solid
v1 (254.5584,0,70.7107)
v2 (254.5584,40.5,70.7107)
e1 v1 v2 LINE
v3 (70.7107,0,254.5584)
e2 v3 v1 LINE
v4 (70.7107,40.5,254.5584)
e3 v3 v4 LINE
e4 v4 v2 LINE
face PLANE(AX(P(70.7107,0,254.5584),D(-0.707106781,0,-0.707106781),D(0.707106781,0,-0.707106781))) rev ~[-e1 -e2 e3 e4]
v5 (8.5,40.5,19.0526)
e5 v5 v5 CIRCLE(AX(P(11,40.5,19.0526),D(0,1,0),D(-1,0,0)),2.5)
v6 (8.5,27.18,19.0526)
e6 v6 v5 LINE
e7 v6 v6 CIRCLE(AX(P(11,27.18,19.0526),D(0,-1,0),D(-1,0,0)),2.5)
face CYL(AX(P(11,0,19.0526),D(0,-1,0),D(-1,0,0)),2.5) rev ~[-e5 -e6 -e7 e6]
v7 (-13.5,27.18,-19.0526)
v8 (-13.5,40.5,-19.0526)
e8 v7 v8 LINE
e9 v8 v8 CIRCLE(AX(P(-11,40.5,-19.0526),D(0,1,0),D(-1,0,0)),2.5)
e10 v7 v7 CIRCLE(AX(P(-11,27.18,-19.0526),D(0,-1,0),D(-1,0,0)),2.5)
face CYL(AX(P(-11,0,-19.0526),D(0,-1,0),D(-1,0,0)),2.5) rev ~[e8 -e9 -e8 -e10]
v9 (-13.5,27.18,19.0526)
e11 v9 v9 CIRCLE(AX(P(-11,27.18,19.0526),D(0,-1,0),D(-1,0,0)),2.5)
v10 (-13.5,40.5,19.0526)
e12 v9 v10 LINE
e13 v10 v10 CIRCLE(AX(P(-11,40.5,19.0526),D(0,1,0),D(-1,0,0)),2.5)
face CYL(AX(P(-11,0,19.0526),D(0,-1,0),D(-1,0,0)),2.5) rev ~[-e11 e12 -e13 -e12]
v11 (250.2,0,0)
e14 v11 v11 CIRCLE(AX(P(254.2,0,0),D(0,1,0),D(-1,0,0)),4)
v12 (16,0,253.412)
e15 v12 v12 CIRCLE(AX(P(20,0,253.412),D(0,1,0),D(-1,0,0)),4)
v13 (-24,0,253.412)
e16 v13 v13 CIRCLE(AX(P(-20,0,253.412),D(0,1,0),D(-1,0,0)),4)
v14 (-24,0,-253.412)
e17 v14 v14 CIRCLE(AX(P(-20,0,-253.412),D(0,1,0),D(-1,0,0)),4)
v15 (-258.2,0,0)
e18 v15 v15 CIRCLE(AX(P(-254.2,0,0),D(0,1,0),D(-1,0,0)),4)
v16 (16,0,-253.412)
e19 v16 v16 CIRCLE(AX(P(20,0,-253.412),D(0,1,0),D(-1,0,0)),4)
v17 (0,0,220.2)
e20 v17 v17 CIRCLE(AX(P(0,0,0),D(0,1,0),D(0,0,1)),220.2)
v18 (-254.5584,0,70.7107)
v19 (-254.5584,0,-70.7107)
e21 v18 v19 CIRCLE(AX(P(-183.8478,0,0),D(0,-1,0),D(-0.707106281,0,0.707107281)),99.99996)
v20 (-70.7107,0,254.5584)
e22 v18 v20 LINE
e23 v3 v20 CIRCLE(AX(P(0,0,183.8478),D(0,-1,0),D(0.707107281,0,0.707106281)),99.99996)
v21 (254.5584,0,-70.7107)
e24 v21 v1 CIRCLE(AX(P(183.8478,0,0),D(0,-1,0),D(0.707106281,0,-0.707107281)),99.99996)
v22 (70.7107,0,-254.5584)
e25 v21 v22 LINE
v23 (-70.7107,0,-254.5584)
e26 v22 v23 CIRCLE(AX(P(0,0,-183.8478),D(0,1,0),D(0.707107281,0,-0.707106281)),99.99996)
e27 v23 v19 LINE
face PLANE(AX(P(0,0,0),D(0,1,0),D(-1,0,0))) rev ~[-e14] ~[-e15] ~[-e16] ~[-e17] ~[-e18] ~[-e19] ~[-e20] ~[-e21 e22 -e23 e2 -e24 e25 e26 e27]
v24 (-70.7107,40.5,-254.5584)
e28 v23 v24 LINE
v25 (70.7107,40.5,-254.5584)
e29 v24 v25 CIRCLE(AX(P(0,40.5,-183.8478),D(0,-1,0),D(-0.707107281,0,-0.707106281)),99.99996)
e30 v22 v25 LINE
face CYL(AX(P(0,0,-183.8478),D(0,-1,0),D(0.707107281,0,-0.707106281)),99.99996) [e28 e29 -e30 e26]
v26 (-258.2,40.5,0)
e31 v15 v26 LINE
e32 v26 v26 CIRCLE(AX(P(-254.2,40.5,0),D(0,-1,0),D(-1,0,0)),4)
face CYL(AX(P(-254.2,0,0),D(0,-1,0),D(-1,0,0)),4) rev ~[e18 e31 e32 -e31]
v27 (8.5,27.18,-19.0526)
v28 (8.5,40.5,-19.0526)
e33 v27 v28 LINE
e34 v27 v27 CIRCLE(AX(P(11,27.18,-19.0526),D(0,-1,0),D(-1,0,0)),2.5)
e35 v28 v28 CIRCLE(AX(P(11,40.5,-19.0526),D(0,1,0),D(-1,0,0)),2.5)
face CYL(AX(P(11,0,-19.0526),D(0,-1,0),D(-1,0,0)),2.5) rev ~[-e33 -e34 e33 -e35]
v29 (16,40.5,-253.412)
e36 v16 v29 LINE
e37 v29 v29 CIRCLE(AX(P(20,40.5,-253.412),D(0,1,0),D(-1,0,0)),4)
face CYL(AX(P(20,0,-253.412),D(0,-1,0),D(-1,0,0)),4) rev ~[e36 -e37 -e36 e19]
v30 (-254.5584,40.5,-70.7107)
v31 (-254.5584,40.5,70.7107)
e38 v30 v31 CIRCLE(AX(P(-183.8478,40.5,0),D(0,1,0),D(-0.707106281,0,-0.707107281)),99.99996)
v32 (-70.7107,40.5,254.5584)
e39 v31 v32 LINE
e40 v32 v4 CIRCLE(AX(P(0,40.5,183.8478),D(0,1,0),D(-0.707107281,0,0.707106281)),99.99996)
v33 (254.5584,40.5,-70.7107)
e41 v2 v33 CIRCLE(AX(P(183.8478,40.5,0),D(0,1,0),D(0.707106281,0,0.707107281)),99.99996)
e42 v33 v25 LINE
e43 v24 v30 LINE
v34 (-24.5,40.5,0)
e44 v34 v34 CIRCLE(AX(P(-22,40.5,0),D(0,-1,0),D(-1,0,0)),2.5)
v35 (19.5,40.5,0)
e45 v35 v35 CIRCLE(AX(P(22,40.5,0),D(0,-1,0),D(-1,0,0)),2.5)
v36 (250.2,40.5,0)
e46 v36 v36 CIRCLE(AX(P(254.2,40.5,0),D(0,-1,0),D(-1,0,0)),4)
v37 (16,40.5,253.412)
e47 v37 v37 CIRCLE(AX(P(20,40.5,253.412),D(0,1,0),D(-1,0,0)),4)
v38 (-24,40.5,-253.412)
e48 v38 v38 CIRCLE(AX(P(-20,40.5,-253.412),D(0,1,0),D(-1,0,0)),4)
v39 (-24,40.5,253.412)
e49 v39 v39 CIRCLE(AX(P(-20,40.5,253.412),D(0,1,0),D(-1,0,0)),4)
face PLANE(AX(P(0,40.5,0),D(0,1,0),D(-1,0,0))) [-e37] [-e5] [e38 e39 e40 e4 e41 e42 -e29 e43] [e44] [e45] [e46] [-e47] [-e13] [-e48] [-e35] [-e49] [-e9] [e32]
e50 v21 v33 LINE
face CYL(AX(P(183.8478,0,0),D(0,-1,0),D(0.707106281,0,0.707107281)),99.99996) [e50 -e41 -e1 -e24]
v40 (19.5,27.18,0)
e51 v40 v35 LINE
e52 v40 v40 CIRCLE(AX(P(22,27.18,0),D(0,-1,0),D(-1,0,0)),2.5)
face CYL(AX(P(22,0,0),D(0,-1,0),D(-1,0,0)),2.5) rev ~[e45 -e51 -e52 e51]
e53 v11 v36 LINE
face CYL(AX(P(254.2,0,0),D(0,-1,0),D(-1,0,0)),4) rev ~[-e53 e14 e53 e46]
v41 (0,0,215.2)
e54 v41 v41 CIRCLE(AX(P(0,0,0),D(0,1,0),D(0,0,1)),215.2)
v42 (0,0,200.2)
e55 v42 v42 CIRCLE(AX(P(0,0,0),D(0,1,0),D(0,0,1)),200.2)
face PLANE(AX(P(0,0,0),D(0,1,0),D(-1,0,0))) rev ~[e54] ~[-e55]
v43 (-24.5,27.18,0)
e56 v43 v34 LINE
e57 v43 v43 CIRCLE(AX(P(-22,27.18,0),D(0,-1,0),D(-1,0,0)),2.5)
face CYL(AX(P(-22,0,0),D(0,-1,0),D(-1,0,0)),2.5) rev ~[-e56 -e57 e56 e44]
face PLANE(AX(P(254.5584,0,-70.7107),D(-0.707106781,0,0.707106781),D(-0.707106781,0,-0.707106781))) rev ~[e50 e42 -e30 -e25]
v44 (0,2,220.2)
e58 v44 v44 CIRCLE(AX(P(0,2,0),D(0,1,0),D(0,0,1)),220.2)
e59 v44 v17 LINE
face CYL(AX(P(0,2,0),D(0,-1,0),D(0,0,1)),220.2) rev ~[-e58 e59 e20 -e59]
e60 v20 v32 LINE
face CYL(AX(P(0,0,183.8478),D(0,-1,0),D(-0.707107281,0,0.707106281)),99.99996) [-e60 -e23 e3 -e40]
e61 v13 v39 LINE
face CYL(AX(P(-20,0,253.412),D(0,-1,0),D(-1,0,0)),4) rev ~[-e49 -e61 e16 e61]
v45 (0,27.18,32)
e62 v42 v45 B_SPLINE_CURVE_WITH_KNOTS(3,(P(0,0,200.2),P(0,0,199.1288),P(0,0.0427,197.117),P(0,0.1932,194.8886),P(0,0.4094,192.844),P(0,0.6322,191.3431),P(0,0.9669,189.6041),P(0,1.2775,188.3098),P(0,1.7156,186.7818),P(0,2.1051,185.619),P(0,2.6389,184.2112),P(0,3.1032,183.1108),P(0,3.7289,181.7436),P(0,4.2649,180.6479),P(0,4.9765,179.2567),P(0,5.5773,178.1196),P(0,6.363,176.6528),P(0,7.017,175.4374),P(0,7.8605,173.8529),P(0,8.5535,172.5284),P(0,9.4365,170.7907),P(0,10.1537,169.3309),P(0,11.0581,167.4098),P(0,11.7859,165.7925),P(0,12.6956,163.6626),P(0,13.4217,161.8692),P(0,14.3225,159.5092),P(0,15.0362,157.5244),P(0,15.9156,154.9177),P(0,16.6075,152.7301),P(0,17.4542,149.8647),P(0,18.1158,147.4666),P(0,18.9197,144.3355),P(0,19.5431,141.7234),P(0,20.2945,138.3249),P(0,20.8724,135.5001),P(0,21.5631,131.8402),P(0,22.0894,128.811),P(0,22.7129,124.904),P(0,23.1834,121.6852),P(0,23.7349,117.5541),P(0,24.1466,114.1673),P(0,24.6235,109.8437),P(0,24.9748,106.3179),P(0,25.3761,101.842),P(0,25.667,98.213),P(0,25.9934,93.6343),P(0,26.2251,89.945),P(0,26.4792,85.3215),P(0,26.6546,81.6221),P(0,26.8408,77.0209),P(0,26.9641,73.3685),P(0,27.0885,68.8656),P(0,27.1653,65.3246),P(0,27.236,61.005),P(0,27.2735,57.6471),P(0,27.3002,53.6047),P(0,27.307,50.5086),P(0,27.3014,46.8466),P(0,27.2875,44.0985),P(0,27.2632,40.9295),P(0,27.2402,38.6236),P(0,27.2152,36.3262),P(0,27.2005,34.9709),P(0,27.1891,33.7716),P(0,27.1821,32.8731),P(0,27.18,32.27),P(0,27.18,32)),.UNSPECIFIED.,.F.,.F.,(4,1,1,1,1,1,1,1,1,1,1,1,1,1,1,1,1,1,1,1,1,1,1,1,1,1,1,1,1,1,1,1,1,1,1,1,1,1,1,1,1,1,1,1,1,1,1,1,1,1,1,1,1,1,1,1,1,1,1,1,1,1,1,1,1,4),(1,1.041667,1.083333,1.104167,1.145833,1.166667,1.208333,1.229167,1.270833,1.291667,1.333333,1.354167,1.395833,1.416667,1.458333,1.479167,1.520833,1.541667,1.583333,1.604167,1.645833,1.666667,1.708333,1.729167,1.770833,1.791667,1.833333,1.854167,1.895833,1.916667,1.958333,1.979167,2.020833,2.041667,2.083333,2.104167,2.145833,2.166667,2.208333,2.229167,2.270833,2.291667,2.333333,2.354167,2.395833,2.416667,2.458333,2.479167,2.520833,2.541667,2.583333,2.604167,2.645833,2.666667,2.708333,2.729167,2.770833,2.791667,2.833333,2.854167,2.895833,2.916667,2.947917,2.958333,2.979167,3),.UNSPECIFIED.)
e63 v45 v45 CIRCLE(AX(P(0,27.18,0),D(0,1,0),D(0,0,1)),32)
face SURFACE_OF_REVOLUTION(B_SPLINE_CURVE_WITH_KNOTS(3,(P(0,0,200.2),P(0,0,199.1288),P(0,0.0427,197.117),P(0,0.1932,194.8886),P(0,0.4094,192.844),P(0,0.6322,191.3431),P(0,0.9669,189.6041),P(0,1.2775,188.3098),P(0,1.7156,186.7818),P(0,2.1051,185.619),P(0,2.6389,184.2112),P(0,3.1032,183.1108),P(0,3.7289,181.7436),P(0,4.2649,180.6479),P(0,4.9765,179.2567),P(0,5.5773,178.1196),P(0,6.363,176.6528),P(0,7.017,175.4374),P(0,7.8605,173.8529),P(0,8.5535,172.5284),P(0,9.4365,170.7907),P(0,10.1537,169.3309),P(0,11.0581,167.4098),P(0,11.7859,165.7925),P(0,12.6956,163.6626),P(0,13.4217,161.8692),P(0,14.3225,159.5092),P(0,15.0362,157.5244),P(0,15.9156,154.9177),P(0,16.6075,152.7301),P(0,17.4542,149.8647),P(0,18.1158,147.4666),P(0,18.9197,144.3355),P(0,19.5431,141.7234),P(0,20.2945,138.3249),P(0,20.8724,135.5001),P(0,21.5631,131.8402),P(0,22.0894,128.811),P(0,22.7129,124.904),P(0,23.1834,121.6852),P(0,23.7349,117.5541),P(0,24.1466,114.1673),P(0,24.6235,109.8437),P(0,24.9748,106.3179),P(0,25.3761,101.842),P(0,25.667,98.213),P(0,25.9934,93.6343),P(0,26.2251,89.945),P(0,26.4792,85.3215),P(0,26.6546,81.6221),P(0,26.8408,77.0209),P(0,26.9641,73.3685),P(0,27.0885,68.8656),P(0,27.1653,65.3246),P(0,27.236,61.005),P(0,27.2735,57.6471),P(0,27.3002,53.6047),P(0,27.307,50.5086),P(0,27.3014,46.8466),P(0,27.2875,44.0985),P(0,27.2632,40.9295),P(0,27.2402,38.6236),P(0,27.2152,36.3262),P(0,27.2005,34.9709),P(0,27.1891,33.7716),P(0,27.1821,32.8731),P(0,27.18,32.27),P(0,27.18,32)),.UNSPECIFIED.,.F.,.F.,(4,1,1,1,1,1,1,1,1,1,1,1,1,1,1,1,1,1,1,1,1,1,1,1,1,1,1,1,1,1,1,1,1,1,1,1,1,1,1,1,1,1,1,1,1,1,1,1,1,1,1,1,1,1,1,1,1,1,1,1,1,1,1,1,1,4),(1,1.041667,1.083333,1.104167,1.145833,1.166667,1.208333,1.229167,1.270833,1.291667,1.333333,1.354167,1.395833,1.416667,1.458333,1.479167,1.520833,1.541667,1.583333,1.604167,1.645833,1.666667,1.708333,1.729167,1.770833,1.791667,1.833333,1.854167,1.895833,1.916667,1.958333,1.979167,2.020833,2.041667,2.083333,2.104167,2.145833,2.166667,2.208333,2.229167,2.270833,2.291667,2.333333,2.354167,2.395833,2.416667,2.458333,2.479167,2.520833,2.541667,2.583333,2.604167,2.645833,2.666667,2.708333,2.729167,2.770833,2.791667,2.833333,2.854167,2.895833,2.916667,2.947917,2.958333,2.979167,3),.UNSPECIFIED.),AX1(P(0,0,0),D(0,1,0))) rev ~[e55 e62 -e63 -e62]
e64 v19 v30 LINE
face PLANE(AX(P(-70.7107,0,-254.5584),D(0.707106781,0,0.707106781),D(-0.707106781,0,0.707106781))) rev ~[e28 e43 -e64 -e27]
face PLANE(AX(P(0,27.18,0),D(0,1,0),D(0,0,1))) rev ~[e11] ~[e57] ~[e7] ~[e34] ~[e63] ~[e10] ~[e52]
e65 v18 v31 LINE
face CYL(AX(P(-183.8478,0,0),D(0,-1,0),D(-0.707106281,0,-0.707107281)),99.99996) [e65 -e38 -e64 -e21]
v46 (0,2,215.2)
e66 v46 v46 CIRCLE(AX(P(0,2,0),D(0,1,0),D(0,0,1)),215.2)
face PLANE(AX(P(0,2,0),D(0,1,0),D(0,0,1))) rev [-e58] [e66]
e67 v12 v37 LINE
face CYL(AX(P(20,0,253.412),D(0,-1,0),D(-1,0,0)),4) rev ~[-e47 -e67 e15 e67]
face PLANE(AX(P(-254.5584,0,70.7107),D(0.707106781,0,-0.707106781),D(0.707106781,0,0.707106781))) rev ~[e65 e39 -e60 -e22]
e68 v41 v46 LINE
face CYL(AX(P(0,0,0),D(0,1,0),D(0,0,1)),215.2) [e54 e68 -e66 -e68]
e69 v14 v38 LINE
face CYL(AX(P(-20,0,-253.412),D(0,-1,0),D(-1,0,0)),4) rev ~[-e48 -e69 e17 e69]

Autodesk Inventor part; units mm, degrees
ref_plane "YZ Plane" through (0, 0, 0) normal (1, 0, 0) x (0, 1, 0)
ref_plane "XZ Plane" through (0, 0, 0) normal (0, 1, 0) x (-1, 0, 0)
sketch "Esquisse1" plane through (0, 0, 0) normal (0, 1, 0) x (-1, 0, 0)
  circle A0 centre (0, 0) radius 215.2 construction
  line L0 (0, -455.3768) -> (0, 455.3768) projected
  line L1 (-455.3768, 0) -> (455.3768, 0) projected
  line L2 (70.7107, -254.5584) -> (254.5584, -70.7107)
  line L3 (254.5584, 70.7107) -> (70.7107, 254.5584)
  line L4 (-70.7107, 254.5584) -> (-254.5584, 70.7107)
  line L5 (-254.5584, -70.7107) -> (-70.7107, -254.5584)
  line L6 (0, -325.2691) -> (0, 325.2691) construction
  line L7 (325.2691, 0) -> (-325.2691, 0) construction
  circle A1 centre (-20, 253.412) radius 4
  circle A2 centre (11, -19.0526) radius 2.5 projected
  circle A3 centre (-11, -19.0526) radius 2.5 projected
  circle A4 centre (-22, 0) radius 2.5 projected
  circle A5 centre (-11, 19.0526) radius 2.5 projected
  circle A6 centre (11, 19.0526) radius 2.5 projected
  circle A7 centre (22, 0) radius 2.5 projected
  circle A8 centre (0, 0) radius 30 construction
  circle A9 centre (0, 0) radius 13 construction
  arc A10 (-254.5584, 70.7107) -> (-254.5584, -70.7107) centre (-183.8478, 0) ccw
  arc A11 (70.7107, 254.5584) -> (-70.7107, 254.5584) centre (0, 183.8478) ccw
  arc A12 (-70.7107, -254.5584) -> (70.7107, -254.5584) centre (0, -183.8478) ccw
  arc A13 (254.5584, -70.7107) -> (254.5584, 70.7107) centre (183.8478, 0) ccw
  circle A14 centre (20, 253.412) radius 4
  circle A15 centre (-20, -253.412) radius 4
  circle A16 centre (20, -253.412) radius 4
  circle A17 centre (-254.2, 0) radius 4
  circle A18 centre (254.2, 0) radius 4
  point P0 (0, 0)
  dimension "d1" = 460
  dimension "d2" = 8
  dimension "d3" = 35
  dimension "d13" = 100
  dimension "d14" = 20
  dimension "d15" = 35
ref_plane "Plan de construction1" through (-34.1506, 32.18, -34.1506) normal (0, 1, 0) x (0.5, 0, 0.8660254)
extrude "Extrusion1" add sketch "Esquisse1" along normal blind 40.5 contours A12 L5 A10 L1 A17 A4 L0 | L0 L1 A7 A18 A13 L2 A12 | L1 A4 A17 A10 L4 A11 L0 | L0 A11 L3 A13 L1 A18 A7
sketch "Esquisse2" plane through (0, 0, 0) normal (1, 0, 0) x (0, 1, 0)
  line L0 (0, 215.2) -> (0, -215.2) projected
  spline S0 degree 3 poles (0, 200.2) (0, 199.1288) (0.0427, 197.117) (0.1932, 194.8886) (0.4094, 192.844) (0.6322, 191.3431) (0.9669, 189.6041) (1.2775, 188.3098) (1.7156, 186.7818) (2.1051, 185.619) (2.6389, 184.2112) (3.1032, 183.1108) (3.7289, 181.7436) (4.2649, 180.6479) (4.9765, 179.2567) (5.5773, 178.1196) (6.363, 176.6528) (7.017, 175.4374) (7.8605, 173.8529) (8.5535, 172.5284) (9.4365, 170.7907) (10.1537, 169.3309) (11.0581, 167.4098) (11.7859, 165.7925) (12.6956, 163.6626) (13.4217, 161.8692) (14.3225, 159.5092) (15.0362, 157.5244) (15.9156, 154.9177) (16.6075, 152.7301) (17.4542, 149.8647) (18.1158, 147.4666) (18.9197, 144.3355) (19.5431, 141.7234) (20.2945, 138.3249) (20.8724, 135.5001) (21.5631, 131.8402) (22.0894, 128.811) (22.7129, 124.904) (23.1834, 121.6852) (23.7349, 117.5541) (24.1466, 114.1673) (24.6235, 109.8437) (24.9748, 106.3179) (25.3761, 101.842) (25.667, 98.213) (25.9934, 93.6343) (26.2251, 89.945) (26.4792, 85.3215) (26.6546, 81.6221) (26.8408, 77.0209) (26.9641, 73.3685) (27.0885, 68.8656) (27.1653, 65.3246) (27.236, 61.005) (27.2735, 57.6471) (27.3002, 53.6047) (27.307, 50.5086) (27.3014, 46.8466) (27.2875, 44.0985) (27.2632, 40.9295) (27.2402, 38.6236) (27.2152, 36.3262) (27.2005, 34.9709) (27.1891, 33.7716) (27.1821, 32.8731) (27.18, 32.27) (27.18, 32) knots 1 1 1 1 1.041667 1.083333 1.104167 1.145833 1.166667 1.208333 1.229167 1.270833 1.291667 1.333333 1.354167 1.395833 1.416667 1.458333 1.479167 1.520833 1.541667 1.583333 1.604167 1.645833 1.666667 1.708333 1.729167 1.770833 1.791667 1.833333 1.854167 1.895833 1.916667 1.958333 1.979167 2.020833 2.041667 2.083333 2.104167 2.145833 2.166667 2.208333 2.229167 2.270833 2.291667 2.333333 2.354167 2.395833 2.416667 2.458333 2.479167 2.520833 2.541667 2.583333 2.604167 2.645833 2.666667 2.708333 2.729167 2.770833 2.791667 2.833333 2.854167 2.895833 2.916667 2.947917 2.958333 2.979167 3 3 3 3 projected
  line L1 (27.18, 32) -> (27.18, -32) projected
  line L2 (27.18, 0) -> (0, 0)
  line L3 (-10.4655, 0) -> (47.1338, 0) projected
  line L4 (0, 215.2) -> (2, 215.2)
  line L5 (2, 215.2) -> (2, 220.2)
  line L6 (2, 220.2) -> (0, 220.2)
  line L7 (0, 220.2) -> (0, 215.2)
  point P0 (0, 200.1682)
  dimension "d11" = 5
  dimension "d12" = 2
revolve "Révolution1" cut sketch "Esquisse2" angle 360 about axis through (0, -10, 0) along (0, 1, 0)
equation "\"d15\" = d3"
properties part number "wheel_rim_mold_A"
